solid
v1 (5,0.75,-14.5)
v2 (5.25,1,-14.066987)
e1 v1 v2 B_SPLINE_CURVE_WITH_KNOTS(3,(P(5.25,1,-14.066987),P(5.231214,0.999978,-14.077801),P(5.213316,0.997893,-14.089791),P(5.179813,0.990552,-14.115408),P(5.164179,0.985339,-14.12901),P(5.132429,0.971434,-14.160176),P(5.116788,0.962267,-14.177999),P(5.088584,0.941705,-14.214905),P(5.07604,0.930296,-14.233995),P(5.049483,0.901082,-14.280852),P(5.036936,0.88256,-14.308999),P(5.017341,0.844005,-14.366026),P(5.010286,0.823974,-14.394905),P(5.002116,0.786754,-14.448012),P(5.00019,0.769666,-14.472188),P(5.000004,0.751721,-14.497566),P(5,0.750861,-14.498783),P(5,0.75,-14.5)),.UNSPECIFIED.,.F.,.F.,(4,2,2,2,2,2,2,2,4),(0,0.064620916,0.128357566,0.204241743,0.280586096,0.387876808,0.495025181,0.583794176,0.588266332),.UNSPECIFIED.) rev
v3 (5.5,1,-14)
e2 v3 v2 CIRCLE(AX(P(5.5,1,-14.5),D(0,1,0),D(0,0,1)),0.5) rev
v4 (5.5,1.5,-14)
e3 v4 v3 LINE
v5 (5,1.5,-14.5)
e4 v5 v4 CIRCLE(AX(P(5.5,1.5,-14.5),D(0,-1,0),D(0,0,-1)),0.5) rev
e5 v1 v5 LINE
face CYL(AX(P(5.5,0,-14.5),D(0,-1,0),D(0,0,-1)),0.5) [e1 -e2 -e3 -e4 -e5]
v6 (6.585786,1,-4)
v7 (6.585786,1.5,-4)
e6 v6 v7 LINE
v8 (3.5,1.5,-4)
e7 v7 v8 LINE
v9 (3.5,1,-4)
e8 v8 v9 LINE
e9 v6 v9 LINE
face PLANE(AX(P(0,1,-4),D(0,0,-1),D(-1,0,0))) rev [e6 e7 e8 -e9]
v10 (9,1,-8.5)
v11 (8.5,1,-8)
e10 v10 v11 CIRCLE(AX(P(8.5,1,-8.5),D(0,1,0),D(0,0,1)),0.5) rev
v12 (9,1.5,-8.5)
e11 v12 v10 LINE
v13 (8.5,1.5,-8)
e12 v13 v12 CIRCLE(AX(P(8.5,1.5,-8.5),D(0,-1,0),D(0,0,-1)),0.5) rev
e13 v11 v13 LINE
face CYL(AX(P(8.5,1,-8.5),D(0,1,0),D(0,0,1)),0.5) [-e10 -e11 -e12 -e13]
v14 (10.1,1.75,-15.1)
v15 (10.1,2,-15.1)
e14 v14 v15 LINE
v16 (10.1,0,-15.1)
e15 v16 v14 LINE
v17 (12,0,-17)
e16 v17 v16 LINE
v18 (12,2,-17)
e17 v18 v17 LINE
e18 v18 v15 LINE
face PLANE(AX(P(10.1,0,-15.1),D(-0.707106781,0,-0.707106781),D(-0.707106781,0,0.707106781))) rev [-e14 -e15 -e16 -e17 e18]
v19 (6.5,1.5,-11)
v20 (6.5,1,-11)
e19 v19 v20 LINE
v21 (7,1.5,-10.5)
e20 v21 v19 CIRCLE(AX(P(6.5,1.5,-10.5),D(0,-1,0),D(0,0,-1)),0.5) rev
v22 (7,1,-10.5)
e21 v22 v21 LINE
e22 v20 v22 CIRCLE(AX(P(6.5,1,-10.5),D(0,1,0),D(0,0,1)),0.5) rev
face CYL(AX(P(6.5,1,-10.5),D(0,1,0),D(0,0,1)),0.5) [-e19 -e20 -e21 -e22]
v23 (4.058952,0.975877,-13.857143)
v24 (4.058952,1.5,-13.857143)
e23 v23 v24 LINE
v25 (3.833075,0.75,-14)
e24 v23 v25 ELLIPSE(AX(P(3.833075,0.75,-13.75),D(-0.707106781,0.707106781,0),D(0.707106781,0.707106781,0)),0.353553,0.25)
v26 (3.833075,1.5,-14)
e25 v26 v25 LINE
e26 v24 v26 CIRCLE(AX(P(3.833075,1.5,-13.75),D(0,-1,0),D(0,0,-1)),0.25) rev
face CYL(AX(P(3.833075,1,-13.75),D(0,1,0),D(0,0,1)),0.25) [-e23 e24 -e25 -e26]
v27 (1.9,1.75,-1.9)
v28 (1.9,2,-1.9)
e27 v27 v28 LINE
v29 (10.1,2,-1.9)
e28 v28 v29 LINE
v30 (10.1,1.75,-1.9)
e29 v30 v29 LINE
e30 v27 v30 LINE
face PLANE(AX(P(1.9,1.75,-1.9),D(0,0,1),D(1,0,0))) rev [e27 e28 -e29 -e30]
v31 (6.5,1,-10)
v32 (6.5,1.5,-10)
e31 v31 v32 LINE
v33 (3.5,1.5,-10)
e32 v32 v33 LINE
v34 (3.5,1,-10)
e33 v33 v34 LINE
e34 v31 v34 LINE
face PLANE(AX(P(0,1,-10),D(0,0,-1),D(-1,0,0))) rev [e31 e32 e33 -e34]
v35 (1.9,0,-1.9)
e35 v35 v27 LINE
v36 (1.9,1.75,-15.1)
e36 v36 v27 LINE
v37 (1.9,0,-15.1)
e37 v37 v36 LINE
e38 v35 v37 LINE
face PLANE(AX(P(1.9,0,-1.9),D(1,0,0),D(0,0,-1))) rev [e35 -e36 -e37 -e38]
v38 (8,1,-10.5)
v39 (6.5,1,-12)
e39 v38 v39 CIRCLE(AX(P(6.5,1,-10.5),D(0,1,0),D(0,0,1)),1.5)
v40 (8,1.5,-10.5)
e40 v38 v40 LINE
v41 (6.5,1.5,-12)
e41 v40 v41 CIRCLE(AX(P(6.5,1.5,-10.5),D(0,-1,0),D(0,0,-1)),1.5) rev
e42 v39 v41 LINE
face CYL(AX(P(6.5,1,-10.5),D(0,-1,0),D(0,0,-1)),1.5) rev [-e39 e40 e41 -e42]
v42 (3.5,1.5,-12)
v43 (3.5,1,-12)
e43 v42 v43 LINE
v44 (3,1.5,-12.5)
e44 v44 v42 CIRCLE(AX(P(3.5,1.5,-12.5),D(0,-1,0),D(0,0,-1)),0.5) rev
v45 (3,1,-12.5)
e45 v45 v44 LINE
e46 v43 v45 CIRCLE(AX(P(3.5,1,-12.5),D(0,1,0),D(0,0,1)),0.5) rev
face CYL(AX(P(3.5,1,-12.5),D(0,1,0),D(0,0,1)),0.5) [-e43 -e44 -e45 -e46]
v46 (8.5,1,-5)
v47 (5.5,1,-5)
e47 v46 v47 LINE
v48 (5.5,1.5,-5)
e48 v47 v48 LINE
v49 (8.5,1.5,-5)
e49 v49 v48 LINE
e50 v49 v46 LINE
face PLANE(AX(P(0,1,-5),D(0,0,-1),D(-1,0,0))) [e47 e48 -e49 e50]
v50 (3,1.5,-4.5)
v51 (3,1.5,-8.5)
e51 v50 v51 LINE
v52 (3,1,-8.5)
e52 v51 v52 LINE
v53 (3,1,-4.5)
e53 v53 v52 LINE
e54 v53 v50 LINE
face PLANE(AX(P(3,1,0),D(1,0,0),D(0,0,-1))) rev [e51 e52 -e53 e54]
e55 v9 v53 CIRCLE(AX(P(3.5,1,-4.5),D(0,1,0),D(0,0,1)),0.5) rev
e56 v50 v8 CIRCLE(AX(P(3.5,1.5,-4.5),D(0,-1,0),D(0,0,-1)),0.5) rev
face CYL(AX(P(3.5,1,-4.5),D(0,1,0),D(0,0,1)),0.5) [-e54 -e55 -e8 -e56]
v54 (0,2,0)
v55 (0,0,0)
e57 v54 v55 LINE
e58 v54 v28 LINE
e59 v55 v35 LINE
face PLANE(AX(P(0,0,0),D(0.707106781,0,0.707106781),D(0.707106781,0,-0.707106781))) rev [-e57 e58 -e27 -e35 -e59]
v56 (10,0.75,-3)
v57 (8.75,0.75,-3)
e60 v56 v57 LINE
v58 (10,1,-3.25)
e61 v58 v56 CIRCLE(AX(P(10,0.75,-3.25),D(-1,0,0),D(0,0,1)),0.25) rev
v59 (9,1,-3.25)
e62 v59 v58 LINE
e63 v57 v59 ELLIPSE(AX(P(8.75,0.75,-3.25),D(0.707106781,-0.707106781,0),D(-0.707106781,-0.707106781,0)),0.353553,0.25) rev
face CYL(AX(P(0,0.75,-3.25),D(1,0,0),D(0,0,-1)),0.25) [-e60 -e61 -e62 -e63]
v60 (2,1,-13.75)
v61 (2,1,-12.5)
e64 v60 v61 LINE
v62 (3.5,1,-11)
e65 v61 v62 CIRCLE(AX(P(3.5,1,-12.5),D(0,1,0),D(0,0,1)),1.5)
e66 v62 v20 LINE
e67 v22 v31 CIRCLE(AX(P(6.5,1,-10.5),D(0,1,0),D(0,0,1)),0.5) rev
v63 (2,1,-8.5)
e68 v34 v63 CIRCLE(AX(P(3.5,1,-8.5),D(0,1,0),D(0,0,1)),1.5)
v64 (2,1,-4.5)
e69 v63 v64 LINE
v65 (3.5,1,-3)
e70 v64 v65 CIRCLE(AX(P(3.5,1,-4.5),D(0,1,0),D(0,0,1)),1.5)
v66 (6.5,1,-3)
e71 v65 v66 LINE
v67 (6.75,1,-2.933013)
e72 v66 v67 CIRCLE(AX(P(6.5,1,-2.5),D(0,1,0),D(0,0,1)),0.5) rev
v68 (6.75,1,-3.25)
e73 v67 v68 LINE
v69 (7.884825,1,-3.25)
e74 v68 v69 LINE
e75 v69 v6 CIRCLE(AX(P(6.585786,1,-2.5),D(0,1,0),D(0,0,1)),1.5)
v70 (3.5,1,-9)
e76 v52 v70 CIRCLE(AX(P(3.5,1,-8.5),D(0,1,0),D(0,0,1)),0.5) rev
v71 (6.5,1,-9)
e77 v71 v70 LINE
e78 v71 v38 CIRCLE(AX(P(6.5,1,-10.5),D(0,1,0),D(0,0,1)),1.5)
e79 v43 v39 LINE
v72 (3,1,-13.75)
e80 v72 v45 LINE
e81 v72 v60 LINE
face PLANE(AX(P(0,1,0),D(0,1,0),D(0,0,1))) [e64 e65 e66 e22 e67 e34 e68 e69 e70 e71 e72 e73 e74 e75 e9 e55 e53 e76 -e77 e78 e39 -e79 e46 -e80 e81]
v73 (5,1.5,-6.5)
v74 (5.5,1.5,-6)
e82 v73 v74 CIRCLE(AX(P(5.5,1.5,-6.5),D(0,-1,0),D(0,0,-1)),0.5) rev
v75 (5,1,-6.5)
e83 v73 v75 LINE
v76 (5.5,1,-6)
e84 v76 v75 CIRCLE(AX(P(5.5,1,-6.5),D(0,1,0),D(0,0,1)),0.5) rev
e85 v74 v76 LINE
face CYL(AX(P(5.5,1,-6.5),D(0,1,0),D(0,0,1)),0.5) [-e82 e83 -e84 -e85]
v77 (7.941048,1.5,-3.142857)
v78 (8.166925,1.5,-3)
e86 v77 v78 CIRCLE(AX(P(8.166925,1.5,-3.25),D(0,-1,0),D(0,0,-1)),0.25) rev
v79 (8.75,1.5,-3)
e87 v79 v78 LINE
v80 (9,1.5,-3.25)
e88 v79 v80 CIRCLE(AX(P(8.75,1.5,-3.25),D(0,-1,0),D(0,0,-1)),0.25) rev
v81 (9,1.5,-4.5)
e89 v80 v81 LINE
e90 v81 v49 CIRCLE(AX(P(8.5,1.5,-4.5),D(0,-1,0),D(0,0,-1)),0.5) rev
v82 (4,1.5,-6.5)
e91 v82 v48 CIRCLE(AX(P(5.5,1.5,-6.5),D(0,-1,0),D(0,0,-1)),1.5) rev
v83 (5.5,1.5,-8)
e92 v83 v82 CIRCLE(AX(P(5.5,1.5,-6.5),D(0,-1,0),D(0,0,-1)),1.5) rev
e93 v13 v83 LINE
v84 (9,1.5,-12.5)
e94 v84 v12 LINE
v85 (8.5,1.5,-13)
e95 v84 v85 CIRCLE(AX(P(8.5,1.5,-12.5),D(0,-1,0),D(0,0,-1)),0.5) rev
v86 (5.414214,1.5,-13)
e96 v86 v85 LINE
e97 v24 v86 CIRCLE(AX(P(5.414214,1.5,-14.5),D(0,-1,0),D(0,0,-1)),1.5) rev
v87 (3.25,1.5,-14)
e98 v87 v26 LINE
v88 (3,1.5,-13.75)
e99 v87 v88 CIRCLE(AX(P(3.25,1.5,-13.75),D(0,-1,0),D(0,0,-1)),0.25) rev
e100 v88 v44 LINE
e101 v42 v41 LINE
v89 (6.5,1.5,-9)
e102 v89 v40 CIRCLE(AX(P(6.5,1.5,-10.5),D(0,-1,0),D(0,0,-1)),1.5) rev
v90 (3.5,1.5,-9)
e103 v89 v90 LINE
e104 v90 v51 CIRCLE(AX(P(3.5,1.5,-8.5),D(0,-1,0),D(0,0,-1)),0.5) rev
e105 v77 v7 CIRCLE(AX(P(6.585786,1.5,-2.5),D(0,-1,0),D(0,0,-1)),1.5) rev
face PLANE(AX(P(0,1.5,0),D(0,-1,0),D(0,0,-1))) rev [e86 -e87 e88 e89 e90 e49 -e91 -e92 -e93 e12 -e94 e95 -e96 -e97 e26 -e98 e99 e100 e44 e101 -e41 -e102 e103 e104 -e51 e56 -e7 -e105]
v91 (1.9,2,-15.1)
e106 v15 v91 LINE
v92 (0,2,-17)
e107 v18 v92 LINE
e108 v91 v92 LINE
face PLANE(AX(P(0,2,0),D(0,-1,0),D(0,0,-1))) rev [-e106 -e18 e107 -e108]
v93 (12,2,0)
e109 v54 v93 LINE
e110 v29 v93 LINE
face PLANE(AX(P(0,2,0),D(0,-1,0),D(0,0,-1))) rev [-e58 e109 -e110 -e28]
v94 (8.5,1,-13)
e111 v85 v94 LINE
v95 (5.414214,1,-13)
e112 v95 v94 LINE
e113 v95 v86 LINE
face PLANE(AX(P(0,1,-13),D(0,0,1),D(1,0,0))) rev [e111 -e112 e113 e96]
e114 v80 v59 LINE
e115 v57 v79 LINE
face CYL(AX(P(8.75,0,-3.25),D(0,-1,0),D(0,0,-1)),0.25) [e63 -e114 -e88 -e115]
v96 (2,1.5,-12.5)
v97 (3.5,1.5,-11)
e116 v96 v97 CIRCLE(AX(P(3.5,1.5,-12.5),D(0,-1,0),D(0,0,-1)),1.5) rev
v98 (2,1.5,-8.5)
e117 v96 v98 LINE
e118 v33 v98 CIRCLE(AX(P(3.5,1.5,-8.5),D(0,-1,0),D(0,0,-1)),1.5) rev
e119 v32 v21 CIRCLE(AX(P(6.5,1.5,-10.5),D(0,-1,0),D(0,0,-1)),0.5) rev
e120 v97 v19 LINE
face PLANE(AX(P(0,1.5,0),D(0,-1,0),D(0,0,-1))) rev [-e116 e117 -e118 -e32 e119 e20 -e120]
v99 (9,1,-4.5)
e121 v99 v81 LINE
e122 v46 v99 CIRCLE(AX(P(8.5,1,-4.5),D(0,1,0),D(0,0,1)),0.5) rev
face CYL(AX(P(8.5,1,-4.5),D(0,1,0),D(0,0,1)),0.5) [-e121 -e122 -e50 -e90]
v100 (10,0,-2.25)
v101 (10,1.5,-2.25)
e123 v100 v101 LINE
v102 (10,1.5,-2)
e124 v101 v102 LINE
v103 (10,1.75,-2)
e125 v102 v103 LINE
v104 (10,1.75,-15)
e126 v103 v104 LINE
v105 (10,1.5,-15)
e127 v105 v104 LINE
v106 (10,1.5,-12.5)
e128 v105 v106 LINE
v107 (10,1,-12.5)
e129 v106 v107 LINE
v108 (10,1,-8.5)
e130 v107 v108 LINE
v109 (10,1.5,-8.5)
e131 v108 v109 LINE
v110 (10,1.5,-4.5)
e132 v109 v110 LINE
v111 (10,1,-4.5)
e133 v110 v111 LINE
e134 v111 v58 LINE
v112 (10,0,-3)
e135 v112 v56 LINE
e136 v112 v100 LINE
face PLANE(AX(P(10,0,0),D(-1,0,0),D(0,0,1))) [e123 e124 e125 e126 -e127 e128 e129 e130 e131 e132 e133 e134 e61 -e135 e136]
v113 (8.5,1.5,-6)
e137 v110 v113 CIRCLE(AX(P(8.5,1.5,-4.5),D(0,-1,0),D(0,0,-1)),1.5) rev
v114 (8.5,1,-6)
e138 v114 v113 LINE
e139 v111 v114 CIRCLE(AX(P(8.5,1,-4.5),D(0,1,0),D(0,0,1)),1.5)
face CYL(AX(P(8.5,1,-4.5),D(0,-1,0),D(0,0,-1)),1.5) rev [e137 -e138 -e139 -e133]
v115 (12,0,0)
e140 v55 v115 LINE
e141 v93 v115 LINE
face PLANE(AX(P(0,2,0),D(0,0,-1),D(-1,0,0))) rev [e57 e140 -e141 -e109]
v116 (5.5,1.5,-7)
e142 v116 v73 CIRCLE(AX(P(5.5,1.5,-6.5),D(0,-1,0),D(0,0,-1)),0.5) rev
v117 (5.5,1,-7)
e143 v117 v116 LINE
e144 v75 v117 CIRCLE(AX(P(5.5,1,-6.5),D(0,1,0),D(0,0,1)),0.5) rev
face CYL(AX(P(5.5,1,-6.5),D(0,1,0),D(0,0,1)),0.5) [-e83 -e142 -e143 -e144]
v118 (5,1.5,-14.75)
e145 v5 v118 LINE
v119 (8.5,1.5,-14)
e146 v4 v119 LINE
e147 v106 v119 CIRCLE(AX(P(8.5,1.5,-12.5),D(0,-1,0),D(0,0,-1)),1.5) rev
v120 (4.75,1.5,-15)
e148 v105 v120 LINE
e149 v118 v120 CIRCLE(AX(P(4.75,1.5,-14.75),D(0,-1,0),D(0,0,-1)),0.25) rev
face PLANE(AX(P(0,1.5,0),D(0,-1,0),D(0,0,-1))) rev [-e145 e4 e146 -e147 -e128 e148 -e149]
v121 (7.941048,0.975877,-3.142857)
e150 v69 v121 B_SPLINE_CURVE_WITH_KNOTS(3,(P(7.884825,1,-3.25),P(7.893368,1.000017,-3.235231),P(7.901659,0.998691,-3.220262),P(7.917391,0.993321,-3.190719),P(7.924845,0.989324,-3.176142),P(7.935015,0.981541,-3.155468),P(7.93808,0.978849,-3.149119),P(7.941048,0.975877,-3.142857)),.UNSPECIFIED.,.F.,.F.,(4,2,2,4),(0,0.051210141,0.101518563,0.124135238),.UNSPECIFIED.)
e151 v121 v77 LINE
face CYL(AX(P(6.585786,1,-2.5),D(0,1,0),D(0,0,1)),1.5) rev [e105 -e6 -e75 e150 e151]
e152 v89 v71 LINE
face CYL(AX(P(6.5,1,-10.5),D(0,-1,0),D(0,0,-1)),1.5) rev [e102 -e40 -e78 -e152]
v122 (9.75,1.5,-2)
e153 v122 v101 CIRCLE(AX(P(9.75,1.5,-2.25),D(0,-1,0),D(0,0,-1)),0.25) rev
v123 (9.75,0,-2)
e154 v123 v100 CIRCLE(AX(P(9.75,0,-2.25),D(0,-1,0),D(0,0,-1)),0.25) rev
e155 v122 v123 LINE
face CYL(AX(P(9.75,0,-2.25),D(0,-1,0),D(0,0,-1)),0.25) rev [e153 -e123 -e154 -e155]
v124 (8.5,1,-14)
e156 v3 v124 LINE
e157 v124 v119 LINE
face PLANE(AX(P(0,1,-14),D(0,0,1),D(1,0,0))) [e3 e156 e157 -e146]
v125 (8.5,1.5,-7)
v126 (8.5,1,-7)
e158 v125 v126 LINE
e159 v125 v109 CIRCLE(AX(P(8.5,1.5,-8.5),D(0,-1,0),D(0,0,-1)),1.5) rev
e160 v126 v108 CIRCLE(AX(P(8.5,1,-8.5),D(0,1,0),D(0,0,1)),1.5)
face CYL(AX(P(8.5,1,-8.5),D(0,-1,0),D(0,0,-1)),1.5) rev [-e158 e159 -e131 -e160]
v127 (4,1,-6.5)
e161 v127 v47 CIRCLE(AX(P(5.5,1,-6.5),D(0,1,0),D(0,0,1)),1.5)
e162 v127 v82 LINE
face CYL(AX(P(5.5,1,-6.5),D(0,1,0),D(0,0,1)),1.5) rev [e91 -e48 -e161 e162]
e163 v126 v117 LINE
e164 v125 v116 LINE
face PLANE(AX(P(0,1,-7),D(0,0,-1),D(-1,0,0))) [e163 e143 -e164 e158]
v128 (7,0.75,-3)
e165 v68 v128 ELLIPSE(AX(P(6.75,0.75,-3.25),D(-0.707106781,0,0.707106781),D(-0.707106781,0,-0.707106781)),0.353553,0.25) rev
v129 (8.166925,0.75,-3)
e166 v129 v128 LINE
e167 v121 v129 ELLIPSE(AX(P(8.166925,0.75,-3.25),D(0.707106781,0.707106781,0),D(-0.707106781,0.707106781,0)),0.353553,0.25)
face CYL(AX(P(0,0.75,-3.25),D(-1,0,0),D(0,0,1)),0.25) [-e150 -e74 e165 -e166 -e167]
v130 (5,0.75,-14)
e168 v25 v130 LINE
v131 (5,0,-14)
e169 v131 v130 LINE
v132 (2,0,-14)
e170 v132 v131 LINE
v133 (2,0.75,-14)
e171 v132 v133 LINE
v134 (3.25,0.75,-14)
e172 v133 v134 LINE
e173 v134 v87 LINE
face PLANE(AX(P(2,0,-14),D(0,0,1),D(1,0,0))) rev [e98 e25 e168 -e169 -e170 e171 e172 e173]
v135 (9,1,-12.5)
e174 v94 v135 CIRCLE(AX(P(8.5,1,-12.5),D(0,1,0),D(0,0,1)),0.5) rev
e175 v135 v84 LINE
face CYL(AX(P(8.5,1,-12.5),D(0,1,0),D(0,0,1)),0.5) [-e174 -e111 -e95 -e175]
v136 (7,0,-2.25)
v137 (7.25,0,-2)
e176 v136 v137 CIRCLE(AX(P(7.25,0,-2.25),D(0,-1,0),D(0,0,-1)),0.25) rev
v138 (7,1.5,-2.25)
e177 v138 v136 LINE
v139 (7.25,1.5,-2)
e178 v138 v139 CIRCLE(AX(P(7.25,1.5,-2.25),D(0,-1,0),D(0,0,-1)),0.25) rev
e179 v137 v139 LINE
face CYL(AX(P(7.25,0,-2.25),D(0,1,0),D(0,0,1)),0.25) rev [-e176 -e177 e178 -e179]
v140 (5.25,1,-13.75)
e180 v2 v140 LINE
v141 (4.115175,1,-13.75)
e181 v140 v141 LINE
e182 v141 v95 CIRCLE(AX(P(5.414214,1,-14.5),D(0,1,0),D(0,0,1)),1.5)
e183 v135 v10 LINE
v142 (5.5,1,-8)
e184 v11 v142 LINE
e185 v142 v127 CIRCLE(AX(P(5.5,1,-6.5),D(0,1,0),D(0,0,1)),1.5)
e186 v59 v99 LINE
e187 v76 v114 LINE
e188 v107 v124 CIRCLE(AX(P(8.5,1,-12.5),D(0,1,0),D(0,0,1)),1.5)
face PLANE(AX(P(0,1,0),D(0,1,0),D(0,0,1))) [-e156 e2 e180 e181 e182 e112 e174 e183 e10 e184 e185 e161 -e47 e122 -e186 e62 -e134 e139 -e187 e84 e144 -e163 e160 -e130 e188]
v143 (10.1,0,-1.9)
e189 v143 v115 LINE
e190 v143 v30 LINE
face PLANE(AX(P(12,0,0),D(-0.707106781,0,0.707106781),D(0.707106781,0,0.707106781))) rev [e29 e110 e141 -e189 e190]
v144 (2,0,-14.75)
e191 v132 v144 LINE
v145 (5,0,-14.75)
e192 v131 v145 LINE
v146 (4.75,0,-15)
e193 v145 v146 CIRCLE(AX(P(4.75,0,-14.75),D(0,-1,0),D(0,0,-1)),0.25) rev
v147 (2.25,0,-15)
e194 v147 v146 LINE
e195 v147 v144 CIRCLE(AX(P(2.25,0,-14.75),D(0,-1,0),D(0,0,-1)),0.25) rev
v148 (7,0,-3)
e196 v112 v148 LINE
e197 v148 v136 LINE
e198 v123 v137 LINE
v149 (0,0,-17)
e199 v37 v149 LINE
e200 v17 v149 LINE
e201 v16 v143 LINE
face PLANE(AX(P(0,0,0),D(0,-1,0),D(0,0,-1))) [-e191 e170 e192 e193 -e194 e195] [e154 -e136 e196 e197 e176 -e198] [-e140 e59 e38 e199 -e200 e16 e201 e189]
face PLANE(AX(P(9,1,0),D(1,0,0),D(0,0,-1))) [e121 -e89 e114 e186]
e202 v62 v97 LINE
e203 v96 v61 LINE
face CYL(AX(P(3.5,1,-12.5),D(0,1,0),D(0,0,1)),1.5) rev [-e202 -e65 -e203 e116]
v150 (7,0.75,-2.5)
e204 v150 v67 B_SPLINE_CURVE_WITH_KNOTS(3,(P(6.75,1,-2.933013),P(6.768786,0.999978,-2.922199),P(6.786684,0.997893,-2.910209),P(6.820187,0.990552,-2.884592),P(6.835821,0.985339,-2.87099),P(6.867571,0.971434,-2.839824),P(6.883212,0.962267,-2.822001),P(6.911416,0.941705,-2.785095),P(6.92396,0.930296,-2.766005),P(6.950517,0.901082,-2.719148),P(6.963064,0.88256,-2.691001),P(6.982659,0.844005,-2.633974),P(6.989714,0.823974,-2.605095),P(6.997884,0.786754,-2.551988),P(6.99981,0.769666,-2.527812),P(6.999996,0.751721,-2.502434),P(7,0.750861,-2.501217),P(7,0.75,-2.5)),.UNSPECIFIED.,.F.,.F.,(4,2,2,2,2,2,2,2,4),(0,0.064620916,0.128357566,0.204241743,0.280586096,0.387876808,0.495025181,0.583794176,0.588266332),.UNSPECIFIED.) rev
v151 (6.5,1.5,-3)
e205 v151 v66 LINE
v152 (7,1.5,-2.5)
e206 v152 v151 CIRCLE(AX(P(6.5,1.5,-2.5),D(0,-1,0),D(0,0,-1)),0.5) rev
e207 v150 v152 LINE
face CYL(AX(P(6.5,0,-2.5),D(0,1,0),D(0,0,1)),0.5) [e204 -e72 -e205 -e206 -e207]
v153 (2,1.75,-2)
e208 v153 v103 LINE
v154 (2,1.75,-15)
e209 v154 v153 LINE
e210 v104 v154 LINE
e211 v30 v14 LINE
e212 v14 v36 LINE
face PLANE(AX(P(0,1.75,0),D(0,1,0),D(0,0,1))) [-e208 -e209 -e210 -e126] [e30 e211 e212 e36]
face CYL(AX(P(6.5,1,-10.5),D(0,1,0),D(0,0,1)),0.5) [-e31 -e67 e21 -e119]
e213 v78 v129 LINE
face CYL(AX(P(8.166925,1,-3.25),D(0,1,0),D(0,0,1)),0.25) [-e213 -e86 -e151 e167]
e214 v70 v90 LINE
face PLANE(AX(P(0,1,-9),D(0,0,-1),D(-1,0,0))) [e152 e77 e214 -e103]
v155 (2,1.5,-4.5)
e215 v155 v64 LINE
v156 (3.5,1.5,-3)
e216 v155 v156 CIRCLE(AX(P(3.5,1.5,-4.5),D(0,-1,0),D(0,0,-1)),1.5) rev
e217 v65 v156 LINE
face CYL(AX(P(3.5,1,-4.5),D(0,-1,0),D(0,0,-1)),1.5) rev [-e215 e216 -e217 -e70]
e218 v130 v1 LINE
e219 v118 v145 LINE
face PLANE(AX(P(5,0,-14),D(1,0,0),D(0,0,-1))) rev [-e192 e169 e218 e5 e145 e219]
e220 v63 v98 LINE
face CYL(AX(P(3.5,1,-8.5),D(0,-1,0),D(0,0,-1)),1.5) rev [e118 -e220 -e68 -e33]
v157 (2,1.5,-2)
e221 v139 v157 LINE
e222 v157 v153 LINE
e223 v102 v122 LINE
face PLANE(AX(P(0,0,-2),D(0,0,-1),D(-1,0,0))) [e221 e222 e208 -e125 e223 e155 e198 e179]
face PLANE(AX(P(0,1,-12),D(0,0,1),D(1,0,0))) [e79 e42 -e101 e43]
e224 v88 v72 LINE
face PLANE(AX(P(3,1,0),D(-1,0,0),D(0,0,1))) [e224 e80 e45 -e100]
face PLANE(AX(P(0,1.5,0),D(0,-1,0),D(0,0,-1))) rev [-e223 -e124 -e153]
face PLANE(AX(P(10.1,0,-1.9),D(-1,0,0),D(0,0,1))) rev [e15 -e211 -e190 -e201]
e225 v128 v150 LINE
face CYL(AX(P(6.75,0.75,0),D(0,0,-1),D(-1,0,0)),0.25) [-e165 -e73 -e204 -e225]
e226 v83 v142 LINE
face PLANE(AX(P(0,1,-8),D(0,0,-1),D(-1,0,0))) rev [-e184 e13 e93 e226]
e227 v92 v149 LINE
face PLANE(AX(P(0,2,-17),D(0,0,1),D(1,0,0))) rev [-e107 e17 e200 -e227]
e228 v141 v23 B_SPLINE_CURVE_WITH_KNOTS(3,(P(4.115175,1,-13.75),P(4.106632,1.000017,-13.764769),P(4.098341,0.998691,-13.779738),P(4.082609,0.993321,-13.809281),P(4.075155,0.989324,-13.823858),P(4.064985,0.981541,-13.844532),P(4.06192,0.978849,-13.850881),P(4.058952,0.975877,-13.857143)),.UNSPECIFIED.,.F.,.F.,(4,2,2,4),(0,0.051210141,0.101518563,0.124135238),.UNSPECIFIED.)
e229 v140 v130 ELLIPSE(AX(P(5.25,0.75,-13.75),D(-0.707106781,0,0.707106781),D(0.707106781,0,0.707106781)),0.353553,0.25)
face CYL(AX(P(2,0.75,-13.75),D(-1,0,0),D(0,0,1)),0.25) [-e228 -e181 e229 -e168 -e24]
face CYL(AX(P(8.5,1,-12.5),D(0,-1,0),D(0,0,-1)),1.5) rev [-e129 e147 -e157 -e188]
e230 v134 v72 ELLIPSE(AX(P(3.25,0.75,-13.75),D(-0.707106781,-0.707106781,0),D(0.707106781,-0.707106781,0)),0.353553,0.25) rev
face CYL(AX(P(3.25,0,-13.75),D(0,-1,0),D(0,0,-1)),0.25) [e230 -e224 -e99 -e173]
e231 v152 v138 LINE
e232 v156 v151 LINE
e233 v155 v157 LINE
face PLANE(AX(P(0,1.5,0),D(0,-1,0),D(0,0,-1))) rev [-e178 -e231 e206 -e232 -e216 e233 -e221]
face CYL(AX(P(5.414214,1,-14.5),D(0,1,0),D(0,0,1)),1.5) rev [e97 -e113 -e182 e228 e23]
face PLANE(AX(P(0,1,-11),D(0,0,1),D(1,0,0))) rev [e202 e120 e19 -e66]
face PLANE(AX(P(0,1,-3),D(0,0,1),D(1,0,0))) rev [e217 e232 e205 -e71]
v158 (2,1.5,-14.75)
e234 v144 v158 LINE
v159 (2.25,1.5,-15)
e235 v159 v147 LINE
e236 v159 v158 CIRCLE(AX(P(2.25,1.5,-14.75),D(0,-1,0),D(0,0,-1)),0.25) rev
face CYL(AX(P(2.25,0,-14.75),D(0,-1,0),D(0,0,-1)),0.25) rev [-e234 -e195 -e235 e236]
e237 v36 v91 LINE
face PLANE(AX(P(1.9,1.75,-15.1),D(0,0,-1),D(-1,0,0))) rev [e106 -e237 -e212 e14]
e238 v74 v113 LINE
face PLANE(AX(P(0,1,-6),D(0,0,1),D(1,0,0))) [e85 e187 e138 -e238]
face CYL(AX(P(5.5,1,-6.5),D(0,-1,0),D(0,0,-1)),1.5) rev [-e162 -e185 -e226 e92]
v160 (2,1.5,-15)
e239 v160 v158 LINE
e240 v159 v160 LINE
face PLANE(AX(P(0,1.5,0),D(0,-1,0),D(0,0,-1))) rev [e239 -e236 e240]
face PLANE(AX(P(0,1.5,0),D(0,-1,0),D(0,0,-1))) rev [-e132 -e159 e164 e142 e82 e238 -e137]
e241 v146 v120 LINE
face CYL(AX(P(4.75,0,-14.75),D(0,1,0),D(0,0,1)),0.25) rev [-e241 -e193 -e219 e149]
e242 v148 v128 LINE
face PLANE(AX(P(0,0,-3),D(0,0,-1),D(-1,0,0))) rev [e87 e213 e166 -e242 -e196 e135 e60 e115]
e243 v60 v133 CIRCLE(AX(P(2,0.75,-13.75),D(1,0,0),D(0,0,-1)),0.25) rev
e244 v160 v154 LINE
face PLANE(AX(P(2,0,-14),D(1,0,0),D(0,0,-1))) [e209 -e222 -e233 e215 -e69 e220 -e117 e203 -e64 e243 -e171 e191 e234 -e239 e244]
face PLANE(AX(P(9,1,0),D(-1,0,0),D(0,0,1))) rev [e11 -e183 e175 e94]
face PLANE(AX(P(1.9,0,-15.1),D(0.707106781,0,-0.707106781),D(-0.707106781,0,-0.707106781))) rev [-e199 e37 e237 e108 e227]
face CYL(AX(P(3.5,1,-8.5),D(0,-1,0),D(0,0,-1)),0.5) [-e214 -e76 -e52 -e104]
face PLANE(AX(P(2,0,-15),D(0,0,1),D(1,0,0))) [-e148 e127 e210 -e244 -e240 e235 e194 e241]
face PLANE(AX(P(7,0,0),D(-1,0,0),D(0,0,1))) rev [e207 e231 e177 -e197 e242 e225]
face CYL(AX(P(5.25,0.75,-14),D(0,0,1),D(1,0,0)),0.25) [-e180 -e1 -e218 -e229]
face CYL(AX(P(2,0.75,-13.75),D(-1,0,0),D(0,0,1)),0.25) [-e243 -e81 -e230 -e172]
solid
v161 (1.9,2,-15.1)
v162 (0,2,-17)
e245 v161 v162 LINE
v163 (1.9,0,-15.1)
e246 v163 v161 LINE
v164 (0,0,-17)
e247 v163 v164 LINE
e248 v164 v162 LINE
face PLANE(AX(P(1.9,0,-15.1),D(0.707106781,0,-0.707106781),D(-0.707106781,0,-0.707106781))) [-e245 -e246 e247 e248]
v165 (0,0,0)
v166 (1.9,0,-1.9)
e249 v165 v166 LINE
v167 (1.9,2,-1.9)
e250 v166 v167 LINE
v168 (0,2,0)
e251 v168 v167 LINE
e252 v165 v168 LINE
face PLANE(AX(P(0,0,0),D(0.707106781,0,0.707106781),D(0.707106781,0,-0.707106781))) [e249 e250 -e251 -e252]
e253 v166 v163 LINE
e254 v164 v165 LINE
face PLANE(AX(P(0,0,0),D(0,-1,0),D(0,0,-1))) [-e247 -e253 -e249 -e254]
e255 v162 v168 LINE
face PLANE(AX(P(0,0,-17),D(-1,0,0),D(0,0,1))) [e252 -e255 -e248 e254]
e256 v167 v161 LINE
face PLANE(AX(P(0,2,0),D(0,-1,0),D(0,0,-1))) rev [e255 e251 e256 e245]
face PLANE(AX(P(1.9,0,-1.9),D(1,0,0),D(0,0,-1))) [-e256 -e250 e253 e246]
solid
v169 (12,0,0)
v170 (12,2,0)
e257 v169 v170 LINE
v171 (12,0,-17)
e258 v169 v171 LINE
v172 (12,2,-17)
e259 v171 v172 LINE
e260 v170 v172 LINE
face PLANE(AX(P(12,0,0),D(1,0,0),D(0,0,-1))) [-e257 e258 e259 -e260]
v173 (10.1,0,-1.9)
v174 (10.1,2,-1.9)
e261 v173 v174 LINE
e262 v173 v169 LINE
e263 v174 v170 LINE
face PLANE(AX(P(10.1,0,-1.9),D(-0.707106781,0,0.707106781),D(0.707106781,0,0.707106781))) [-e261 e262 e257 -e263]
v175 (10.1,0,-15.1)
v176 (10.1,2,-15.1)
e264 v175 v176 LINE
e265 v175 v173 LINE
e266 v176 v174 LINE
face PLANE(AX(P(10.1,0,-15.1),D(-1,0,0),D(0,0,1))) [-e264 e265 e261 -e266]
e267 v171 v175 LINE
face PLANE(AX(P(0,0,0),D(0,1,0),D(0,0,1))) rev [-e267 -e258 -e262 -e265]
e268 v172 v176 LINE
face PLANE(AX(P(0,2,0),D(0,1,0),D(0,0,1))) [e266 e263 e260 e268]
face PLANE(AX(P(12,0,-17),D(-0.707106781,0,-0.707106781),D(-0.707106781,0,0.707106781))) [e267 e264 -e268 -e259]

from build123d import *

# Parameters (mm, degrees)
SKIZZE1_W                            = 12
SKIZZE1_H                            = 17
AUFSATZ_LINEAR_AUSTRAGEN1_DEPTH      = 2
SCHNITT_LINEAR_AUSTRAGEN1_DEPTH      = 21.90454496
SCHNITT_LINEAR_AUSTRAGEN1_DEPTH_BACK = 21.90454496
SKIZZE4_W                            = 3
SKIZZE4_H                            = 1
SCHNITT_LINEAR_AUSTRAGEN3_DEPTH      = 1
VERRUNDUNG1_R                        = 0.5
VERRUNDUNG2_R                        = 1.5
VERRUNDUNG3_R                        = 0.25
SKIZZE2_W                            = 8
SKIZZE2_H                            = 13
SCHNITT_LINEAR_AUSTRAGEN4_DEPTH      = 0.5
SKIZZE6_W                            = 8.2
SKIZZE6_H                            = 13.2
SKIZZE6_W_2                          = 8
SKIZZE6_H_2                          = 13
SCHNITT_LINEAR_AUSTRAGEN5_DEPTH      = 0.25
SCHNITT_LINEAR_AUSTRAGEN6_DEPTH      = 21.90454496
AUFSATZ_LINEAR_AUSTRAGEN2_DEPTH      = 2
AUFSATZ_LINEAR_AUSTRAGEN2_2_DEPTH    = 2


# Some blends are built 0.0001 mm under size
with BuildPart() as part:
    # Skizze1 → Aufsatz-Linear austragen1 (new body)
    with BuildSketch(Plane(origin=(0, 0, 0), x_dir=(1, 0, 0), z_dir=(0, 1, 0))):
        with Locations((6, 8.5)):
            Rectangle(SKIZZE1_W, SKIZZE1_H)
    extrude(amount=AUFSATZ_LINEAR_AUSTRAGEN1_DEPTH)

    # Skizze4 → Schnitt-Linear austragen1 (cut, two sides: drawn at the far end of the back side and taken through both)
    with BuildSketch(Plane(origin=(0, 2, 0), x_dir=(1, 0, 0), z_dir=(0, 1, 0)).offset(-SCHNITT_LINEAR_AUSTRAGEN1_DEPTH_BACK)):
        with Locations((8.5, 2.5)):
            Rectangle(SKIZZE4_W, SKIZZE4_H)
        with Locations((3.5, 14.5)):
            Rectangle(SKIZZE4_W, SKIZZE4_H)
    extrude(amount=SCHNITT_LINEAR_AUSTRAGEN1_DEPTH + SCHNITT_LINEAR_AUSTRAGEN1_DEPTH_BACK, mode=Mode.SUBTRACT)

    # Skizze3 → Schnitt-Linear austragen3 (cut)
    with BuildSketch(Plane(origin=(0, 2, 0), x_dir=(1, 0, 0), z_dir=(0, 1, 0))):
        Polygon((8, 4), (3, 4), (3, 9), (8, 9), (8, 12), (3, 12), (3, 14), (2, 14), (2, 11), (7, 11), (7, 10), (2, 10), (2, 3), (8, 3), align=None)
        Polygon((9, 5), (4, 5), (4, 8), (9, 8), (9, 13), (4, 13), (4, 14), (10, 14), (10, 7), (5, 7), (5, 6), (10, 6), (10, 3), (9, 3), align=None)
    extrude(amount=-SCHNITT_LINEAR_AUSTRAGEN3_DEPTH, mode=Mode.SUBTRACT)

    # Verrundung1
    verrundung1_edges = [part.edges().sort_by_distance(p)[0] for p in [
        (3, 1.5, -12),
        (3, 1.5, -9),
        (7, 1.5, -3),
        (5, 1.5, -14),
        (9, 1.5, -5),
        (9, 1.5, -8),
        (9, 1.5, -13),
        (5, 1.5, -7),
        (5, 1.5, -6),
        (3, 1.5, -4),
        (7, 1.5, -10),
        (7, 1.5, -11),
    ]]
    fillet(verrundung1_edges, radius=VERRUNDUNG1_R - 0.0001)  # a hair under: the kernel refuses the full size

    # Verrundung2
    # the kernel refuses this fillet: 1.5 mm, written as the material it adds along each edge
    with BuildSketch(Plane(origin=(4, 2, -8), x_dir=(0, 0, 1), z_dir=(0, -1, 0)), Plane(origin=(2, 2, -11), x_dir=(1, 0, 0), z_dir=(0, -1, 0)), Plane(origin=(2, 2, -3), x_dir=(1, 0, 0), z_dir=(0, -1, 0)), Plane(origin=(2, 2, -10), x_dir=(0, 0, 1), z_dir=(0, -1, 0)), Plane(origin=(4, 2, -5), x_dir=(1, 0, 0), z_dir=(0, -1, 0))) as verrundung2_piece_1:
        with BuildLine():
            CenterArc((VERRUNDUNG2_R, -VERRUNDUNG2_R), VERRUNDUNG2_R, 90, 90)
            Line((0, -VERRUNDUNG2_R), (-VERRUNDUNG2_R * 0.02, -VERRUNDUNG2_R))
            Line((-VERRUNDUNG2_R * 0.02, -VERRUNDUNG2_R), (-VERRUNDUNG2_R * 0.02, VERRUNDUNG2_R * 0.02))
            Line((-VERRUNDUNG2_R * 0.02, VERRUNDUNG2_R * 0.02), (VERRUNDUNG2_R, VERRUNDUNG2_R * 0.02))
            Line((VERRUNDUNG2_R, VERRUNDUNG2_R * 0.02), (VERRUNDUNG2_R, 0))
        make_face()
    extrude(amount=1)
    with BuildSketch(Plane(origin=(8, 2, -4), x_dir=(-1, 0, 0), z_dir=(0, -1, 0)), Plane(origin=(4, 2, -13), x_dir=(1, 0, 0), z_dir=(0, -1, 0))) as verrundung2_piece_2:
        with BuildLine():
            CenterArc((1.414213562, -1.5), VERRUNDUNG2_R, 90, 70.528779366)
            Line((0, -1), (-0.028284271, -0.99))
            ThreePointArc((-0.028284271, -0.99), (-0.03, -0.5), (-0.03, 0))
            Line((-0.03, 0), (0, 0.03))
            Line((0, 0.03), (1.414213562, 0.03))
            Line((1.414213562, 0.03), (1.414213562, 0))
        make_face()
    extrude(amount=1)
    with BuildSketch(Plane(origin=(10, 2, -14), x_dir=(0, 0, 1), z_dir=(0, -1, 0)), Plane(origin=(10, 2, -7), x_dir=(-1, 0, 0), z_dir=(0, -1, 0)), Plane(origin=(10, 2, -6), x_dir=(0, 0, 1), z_dir=(0, -1, 0)), Plane(origin=(8, 2, -12), x_dir=(0, 0, 1), z_dir=(0, -1, 0)), Plane(origin=(8, 2, -9), x_dir=(-1, 0, 0), z_dir=(0, -1, 0))) as verrundung2_piece_3:
        with BuildLine():
            CenterArc((VERRUNDUNG2_R, VERRUNDUNG2_R), VERRUNDUNG2_R, 180, 90)
            Line((0, VERRUNDUNG2_R), (-VERRUNDUNG2_R * 0.02, VERRUNDUNG2_R))
            Line((-VERRUNDUNG2_R * 0.02, VERRUNDUNG2_R), (-VERRUNDUNG2_R * 0.02, -VERRUNDUNG2_R * 0.02))
            Line((-VERRUNDUNG2_R * 0.02, -VERRUNDUNG2_R * 0.02), (VERRUNDUNG2_R, -VERRUNDUNG2_R * 0.02))
            Line((VERRUNDUNG2_R, -VERRUNDUNG2_R * 0.02), (VERRUNDUNG2_R, 0))
        make_face()
    extrude(amount=1)

    # Verrundung3
    verrundung3_edges = [part.edges().sort_by_distance(p)[0] for p in [
        (3, 1.5, -14),
        (2.5, 1, -14),
        (5, 1, -14.24995),
        (7, 1, -2.75005),
        (10, 1, -2),
        (7, 1, -2),
        (2, 1, -15),
        (5, 1, -15),
        (4, 1.5, -14),
        (9, 1.5, -3),
        (4.5, 1, -14),
        (9.5, 1, -3),
        (7.5, 1, -3),
        (8, 1.5, -3),
    ]]
    fillet(verrundung3_edges, radius=VERRUNDUNG3_R)

    # Skizze2 → Schnitt-Linear austragen4 (cut)
    with BuildSketch(Plane(origin=(0, 2, 0), x_dir=(1, 0, 0), z_dir=(0, 1, 0))):
        with Locations((6, 8.5)):
            Rectangle(SKIZZE2_W, SKIZZE2_H)
    extrude(amount=-SCHNITT_LINEAR_AUSTRAGEN4_DEPTH, mode=Mode.SUBTRACT)

    # Skizze6 → Schnitt-Linear austragen5 (cut)
    with BuildSketch(Plane(origin=(0, 2, 0), x_dir=(1, 0, 0), z_dir=(0, 1, 0))):
        with Locations((6, 8.5)):
            Rectangle(SKIZZE6_W, SKIZZE6_H)
        with Locations((6, 8.5)):
            Rectangle(SKIZZE6_W_2, SKIZZE6_H_2, mode=Mode.SUBTRACT)
    extrude(amount=-SCHNITT_LINEAR_AUSTRAGEN5_DEPTH, mode=Mode.SUBTRACT)

    # Skizze7 → Schnitt-Linear austragen6 (cut, through all)
    with BuildSketch(Plane(origin=(0, 2, 0), x_dir=(1, 0, 0), z_dir=(0, 1, 0))):
        Polygon((1.9, 15.1), (0, 17), (0, 0), (1.9, 1.9), align=None)
        Polygon((10.1, 15.1), (12, 17), (12, 0), (10.1, 1.9), align=None)
    extrude(amount=-SCHNITT_LINEAR_AUSTRAGEN6_DEPTH, mode=Mode.SUBTRACT)


with BuildPart() as body_2:
    # Skizze8 → Aufsatz-Linear austragen2 (new body)
    with BuildSketch(Plane(origin=(0, 2, 0), x_dir=(1, 0, 0), z_dir=(0, 1, 0))):
        Polygon((0, 17), (0, 0), (1.9, 1.9), (1.9, 15.1), align=None)
    extrude(amount=-AUFSATZ_LINEAR_AUSTRAGEN2_DEPTH)


with BuildPart() as body_3:
    # Skizze8 → Aufsatz-Linear austragen2 2 (new body)
    with BuildSketch(Plane(origin=(0, 2, 0), x_dir=(1, 0, 0), z_dir=(0, 1, 0))):
        Polygon((10.1, 15.1), (10.1, 1.9), (12, 0), (12, 17), align=None)
    extrude(amount=-AUFSATZ_LINEAR_AUSTRAGEN2_2_DEPTH)


solid = Compound([part.part, body_2.part, body_3.part])
